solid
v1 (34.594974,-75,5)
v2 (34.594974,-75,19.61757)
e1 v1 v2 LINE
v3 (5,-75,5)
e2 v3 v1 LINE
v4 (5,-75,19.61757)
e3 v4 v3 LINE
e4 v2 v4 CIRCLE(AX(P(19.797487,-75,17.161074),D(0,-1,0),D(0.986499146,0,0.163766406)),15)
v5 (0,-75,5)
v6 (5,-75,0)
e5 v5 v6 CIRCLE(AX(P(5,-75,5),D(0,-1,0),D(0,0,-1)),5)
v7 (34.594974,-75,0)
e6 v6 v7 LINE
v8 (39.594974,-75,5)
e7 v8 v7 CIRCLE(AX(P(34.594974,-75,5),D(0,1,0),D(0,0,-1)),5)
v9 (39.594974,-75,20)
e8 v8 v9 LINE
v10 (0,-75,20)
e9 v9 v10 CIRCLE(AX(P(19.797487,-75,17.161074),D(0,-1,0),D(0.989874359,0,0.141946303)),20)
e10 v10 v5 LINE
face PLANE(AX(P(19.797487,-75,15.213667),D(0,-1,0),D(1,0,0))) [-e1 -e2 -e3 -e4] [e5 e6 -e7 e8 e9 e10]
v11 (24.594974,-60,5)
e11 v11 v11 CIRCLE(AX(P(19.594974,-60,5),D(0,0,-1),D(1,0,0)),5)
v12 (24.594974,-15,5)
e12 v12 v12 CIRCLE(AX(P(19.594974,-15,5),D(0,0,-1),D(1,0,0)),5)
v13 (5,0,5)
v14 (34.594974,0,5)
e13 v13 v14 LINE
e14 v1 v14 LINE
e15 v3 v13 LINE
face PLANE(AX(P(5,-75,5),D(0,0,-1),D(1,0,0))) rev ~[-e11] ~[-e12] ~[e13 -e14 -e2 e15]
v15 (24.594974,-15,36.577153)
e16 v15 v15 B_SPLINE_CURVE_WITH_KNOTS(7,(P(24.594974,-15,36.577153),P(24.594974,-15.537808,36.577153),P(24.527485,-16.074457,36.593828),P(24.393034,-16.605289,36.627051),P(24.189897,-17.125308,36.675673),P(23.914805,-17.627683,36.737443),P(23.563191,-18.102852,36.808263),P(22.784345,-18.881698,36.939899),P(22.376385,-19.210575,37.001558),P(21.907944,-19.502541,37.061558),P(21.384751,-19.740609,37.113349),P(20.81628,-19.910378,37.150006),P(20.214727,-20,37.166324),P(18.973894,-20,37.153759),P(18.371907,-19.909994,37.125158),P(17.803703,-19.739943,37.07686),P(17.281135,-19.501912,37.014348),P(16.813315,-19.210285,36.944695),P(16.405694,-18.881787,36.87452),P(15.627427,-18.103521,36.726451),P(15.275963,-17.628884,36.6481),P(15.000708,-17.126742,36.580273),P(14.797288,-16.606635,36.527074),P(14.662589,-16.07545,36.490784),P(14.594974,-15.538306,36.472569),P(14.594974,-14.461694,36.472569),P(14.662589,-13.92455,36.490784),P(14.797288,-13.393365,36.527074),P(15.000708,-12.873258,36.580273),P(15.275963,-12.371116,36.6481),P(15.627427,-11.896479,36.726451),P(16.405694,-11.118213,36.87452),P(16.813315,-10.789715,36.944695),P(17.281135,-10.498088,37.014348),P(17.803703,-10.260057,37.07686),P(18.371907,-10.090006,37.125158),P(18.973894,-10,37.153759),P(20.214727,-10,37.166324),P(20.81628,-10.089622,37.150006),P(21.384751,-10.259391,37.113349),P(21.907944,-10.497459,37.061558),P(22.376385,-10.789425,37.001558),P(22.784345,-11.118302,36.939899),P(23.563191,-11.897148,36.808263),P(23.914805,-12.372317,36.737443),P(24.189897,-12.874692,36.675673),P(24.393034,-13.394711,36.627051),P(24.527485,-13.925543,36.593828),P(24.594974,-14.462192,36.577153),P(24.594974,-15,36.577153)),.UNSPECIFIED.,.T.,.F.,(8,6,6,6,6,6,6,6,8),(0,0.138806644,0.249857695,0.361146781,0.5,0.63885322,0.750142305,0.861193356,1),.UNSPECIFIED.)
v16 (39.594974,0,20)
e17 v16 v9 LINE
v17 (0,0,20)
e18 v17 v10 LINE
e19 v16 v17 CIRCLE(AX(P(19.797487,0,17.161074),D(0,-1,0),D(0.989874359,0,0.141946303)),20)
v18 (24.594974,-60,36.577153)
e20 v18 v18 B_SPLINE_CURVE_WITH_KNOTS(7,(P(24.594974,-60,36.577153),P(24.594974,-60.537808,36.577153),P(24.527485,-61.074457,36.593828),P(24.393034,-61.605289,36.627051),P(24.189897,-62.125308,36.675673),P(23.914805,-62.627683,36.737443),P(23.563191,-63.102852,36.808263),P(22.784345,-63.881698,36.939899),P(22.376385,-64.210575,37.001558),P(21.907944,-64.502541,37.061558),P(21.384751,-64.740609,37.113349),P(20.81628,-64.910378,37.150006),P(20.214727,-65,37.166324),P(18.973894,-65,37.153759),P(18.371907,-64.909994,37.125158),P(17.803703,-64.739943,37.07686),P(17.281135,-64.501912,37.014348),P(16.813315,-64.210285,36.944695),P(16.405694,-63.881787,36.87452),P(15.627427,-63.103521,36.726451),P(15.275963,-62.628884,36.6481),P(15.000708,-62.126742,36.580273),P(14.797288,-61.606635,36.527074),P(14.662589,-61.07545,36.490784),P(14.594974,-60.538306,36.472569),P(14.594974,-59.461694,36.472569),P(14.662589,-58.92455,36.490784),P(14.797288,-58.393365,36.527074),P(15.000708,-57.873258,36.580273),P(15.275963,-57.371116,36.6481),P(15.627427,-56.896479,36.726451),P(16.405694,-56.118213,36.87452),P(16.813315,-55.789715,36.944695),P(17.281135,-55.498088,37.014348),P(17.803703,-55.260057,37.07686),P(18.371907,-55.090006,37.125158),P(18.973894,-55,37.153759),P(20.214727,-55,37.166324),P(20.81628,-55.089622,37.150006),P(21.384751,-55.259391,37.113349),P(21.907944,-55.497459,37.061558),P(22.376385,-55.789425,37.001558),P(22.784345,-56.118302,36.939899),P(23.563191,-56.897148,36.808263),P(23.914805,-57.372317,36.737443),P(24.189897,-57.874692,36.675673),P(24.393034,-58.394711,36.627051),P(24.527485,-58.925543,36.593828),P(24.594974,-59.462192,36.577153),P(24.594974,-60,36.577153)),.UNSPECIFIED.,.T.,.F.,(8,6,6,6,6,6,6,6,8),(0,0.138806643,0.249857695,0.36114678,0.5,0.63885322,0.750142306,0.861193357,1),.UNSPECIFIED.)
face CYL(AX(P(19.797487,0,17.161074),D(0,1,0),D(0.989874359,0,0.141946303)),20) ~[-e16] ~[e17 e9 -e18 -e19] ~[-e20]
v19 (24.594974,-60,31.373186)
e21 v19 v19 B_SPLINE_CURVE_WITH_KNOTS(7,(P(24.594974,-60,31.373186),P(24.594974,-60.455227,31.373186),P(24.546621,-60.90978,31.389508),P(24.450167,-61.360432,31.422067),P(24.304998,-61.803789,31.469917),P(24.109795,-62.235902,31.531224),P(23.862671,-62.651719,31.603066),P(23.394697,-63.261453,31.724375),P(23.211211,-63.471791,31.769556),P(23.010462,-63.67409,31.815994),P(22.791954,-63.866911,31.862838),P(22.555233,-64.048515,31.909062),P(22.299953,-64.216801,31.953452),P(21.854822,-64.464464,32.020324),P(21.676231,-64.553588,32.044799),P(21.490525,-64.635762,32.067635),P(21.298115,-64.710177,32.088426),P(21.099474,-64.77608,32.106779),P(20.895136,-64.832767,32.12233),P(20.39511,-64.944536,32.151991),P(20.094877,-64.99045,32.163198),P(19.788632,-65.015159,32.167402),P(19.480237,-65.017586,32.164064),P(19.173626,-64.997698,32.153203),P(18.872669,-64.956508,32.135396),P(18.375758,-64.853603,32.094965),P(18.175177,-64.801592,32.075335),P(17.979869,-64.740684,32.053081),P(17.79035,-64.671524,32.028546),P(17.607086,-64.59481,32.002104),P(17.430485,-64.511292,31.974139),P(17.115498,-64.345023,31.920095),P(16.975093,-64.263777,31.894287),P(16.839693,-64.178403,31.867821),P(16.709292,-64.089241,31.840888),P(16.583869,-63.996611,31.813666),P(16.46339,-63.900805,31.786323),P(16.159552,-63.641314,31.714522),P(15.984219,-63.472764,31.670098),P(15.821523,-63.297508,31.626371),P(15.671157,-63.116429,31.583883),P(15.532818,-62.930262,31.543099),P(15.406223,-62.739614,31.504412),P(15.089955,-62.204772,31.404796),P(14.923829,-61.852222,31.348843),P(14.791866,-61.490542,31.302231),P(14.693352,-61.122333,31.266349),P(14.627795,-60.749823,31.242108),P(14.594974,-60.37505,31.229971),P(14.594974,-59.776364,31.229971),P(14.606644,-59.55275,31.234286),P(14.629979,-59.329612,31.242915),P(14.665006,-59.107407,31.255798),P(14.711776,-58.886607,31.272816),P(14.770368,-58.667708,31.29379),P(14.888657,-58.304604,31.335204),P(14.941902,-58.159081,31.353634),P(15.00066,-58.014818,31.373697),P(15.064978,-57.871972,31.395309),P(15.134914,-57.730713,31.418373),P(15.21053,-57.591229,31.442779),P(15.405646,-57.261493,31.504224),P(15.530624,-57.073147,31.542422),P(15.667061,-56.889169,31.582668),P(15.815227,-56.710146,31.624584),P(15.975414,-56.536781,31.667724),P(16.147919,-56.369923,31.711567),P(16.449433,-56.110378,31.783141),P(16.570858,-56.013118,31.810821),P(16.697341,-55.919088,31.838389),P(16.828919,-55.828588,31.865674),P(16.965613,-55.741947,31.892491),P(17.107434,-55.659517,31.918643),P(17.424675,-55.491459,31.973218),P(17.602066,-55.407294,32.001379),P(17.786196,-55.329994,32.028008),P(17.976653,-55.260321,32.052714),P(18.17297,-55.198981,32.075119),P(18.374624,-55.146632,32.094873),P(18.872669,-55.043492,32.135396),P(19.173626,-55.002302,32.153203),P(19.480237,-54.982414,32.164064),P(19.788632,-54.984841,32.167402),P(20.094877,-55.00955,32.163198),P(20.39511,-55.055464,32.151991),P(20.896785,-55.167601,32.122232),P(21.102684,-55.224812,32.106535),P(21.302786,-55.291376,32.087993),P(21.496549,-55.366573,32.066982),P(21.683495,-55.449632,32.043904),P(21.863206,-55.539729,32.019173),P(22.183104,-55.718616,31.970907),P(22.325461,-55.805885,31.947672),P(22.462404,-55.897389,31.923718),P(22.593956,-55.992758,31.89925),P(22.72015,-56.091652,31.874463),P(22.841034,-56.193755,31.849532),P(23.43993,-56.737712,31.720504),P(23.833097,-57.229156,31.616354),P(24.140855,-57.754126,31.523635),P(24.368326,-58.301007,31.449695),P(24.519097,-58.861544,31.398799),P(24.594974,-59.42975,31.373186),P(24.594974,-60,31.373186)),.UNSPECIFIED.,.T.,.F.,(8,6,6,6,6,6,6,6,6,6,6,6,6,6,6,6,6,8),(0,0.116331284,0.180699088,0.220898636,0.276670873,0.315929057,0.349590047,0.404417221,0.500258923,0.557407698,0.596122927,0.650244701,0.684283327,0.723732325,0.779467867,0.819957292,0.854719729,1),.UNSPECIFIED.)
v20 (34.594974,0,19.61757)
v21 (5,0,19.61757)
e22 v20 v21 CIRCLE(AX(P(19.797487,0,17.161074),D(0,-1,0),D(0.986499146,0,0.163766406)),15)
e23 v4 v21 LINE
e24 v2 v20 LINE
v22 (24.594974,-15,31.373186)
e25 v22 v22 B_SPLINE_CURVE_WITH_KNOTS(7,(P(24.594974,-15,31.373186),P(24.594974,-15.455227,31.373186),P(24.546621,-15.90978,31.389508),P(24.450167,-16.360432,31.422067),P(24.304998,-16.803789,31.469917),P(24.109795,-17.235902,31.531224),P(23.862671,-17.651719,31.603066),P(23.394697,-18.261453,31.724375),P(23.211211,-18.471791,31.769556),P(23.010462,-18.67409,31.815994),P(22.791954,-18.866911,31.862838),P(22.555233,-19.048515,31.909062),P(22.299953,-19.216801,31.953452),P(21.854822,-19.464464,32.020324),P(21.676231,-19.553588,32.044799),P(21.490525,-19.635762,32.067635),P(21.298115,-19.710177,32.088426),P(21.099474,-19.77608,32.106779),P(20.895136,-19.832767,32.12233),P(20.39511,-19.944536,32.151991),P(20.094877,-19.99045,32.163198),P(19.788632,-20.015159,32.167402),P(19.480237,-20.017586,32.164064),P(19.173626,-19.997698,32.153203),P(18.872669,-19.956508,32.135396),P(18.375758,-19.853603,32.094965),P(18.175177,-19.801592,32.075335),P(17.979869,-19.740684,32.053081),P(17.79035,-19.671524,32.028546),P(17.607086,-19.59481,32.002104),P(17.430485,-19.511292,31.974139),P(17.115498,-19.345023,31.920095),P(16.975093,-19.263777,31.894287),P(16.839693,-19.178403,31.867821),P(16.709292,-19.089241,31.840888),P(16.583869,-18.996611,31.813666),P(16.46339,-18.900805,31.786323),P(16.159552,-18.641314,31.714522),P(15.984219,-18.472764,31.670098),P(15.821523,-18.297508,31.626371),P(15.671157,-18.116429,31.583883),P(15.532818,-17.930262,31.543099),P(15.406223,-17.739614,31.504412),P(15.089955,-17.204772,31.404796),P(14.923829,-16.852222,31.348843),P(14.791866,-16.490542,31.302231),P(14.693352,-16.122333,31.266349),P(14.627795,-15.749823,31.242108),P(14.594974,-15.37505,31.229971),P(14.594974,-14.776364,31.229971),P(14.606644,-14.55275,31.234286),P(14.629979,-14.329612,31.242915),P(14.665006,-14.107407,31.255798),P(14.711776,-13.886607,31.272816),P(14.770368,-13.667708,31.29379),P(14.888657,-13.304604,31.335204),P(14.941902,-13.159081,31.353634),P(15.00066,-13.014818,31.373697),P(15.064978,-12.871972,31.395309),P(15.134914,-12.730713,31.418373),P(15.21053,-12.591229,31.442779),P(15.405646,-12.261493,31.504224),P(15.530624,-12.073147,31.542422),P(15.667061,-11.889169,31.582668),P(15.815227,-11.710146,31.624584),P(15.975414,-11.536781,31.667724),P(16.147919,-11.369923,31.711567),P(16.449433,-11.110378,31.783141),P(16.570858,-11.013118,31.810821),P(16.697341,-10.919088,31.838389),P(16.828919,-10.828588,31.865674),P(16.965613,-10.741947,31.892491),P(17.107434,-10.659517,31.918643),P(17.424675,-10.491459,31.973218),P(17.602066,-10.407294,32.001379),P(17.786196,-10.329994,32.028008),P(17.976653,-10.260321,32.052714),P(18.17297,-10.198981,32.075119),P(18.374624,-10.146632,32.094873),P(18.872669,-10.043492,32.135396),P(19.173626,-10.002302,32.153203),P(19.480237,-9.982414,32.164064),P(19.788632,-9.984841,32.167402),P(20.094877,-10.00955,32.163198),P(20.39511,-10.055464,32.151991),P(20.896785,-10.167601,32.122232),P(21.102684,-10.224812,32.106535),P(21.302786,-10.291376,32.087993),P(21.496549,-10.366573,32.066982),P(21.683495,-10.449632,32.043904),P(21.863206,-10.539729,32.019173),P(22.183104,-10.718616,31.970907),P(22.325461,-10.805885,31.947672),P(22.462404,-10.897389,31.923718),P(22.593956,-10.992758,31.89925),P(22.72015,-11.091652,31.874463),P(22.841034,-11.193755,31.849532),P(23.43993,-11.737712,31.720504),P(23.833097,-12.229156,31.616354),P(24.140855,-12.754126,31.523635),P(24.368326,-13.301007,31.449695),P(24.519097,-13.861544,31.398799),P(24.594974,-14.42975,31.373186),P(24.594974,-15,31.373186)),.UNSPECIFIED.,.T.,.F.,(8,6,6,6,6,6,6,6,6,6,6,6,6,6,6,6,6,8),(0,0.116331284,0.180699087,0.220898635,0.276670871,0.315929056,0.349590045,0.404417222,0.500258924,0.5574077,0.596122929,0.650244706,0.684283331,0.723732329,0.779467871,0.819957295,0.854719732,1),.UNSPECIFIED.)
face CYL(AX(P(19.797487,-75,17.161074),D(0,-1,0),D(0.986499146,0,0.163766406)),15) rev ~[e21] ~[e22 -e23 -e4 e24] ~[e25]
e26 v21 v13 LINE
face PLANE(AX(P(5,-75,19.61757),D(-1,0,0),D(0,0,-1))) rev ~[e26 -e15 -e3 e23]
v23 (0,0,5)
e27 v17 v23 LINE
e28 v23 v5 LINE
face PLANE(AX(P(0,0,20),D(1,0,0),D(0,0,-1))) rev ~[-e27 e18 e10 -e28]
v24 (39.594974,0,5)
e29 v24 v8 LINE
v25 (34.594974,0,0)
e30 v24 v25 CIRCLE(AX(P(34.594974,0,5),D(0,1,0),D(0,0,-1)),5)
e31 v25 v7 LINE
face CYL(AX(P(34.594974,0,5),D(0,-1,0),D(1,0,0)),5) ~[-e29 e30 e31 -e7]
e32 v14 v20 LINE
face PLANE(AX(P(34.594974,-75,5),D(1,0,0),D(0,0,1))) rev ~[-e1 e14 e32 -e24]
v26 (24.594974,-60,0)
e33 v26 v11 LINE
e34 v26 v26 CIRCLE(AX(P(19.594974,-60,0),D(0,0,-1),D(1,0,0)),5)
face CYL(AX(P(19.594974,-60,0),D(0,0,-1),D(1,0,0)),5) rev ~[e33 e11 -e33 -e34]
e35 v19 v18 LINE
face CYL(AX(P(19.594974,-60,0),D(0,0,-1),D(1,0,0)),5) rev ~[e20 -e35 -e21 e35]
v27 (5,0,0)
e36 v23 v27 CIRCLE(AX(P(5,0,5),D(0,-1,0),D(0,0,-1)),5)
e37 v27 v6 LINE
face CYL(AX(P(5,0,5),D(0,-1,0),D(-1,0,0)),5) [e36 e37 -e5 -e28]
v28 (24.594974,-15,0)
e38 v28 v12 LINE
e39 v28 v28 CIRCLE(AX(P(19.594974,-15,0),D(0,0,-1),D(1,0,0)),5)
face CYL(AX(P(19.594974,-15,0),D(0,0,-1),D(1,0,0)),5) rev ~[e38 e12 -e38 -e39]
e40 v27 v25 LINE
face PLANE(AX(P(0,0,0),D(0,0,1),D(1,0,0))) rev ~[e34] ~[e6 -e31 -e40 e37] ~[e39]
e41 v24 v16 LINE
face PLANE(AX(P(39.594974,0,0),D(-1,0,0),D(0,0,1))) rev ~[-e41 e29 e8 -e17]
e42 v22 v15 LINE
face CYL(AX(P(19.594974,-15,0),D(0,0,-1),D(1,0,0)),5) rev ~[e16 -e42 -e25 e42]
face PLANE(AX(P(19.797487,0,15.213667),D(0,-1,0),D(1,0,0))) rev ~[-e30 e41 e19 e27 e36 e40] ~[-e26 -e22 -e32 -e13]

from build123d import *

# Parameters (mm, degrees)
F1_DEPTH = 75
F3_DEPTH = 75.001
F4_R     = 5
F5_DEPTH = 37.1620739384
F6_R     = 5


# Not quite as in the source:
# - a feature of the source that left no trace in its solid (it failed there, or was rolled back) is left out


with BuildPart() as f1:
    # F0 (on Front) → F1 (new body)
    with BuildSketch(Plane.XZ):
        with BuildLine():
            ThreePointArc((39.5949743688, 20), (19.7974871844, 37.1610739384), (0, 20))
            Line((0, 20), (0, 0))
            Line((0, 0), (39.5949743688, 0))
            Line((39.5949743688, 0), (39.5949743688, 20))
        make_face()
    extrude(amount=F1_DEPTH)

    # F2 (on face) → F3 (cut, through all)
    with BuildSketch(Plane.XZ.offset(75)):
        with BuildLine():
            Line((34.5949743688, 5), (34.5949743688, 19.6175700258))
            ThreePointArc((34.5949743688, 19.6175700258), (19.7974871844, 32.1610739384), (5, 19.6175700258))
            Line((5, 19.6175700258), (5, 5))
            Line((5, 5), (34.5949743688, 5))
        make_face()
    extrude(amount=-F3_DEPTH, mode=Mode.SUBTRACT)

    # F4 (on face) → F5 (cut, through all)
    with BuildSketch(Plane(origin=(0, 0, 0), x_dir=(1, 0, 0), z_dir=(0, 0, -1))):
        with Locations((19.5949743688, 60)):
            Circle(F4_R)
        with Locations((19.5949743688, 15)):
            Circle(F4_R)
    extrude(amount=-F5_DEPTH, mode=Mode.SUBTRACT)

    # F6
    f6_edges = [f1.edges().sort_by_distance(p)[0] for p in [
        (39.594974, -37.5, 0),
        (0, -37.5, 0),
    ]]
    fillet(f6_edges, radius=F6_R)


solid = f1.part
